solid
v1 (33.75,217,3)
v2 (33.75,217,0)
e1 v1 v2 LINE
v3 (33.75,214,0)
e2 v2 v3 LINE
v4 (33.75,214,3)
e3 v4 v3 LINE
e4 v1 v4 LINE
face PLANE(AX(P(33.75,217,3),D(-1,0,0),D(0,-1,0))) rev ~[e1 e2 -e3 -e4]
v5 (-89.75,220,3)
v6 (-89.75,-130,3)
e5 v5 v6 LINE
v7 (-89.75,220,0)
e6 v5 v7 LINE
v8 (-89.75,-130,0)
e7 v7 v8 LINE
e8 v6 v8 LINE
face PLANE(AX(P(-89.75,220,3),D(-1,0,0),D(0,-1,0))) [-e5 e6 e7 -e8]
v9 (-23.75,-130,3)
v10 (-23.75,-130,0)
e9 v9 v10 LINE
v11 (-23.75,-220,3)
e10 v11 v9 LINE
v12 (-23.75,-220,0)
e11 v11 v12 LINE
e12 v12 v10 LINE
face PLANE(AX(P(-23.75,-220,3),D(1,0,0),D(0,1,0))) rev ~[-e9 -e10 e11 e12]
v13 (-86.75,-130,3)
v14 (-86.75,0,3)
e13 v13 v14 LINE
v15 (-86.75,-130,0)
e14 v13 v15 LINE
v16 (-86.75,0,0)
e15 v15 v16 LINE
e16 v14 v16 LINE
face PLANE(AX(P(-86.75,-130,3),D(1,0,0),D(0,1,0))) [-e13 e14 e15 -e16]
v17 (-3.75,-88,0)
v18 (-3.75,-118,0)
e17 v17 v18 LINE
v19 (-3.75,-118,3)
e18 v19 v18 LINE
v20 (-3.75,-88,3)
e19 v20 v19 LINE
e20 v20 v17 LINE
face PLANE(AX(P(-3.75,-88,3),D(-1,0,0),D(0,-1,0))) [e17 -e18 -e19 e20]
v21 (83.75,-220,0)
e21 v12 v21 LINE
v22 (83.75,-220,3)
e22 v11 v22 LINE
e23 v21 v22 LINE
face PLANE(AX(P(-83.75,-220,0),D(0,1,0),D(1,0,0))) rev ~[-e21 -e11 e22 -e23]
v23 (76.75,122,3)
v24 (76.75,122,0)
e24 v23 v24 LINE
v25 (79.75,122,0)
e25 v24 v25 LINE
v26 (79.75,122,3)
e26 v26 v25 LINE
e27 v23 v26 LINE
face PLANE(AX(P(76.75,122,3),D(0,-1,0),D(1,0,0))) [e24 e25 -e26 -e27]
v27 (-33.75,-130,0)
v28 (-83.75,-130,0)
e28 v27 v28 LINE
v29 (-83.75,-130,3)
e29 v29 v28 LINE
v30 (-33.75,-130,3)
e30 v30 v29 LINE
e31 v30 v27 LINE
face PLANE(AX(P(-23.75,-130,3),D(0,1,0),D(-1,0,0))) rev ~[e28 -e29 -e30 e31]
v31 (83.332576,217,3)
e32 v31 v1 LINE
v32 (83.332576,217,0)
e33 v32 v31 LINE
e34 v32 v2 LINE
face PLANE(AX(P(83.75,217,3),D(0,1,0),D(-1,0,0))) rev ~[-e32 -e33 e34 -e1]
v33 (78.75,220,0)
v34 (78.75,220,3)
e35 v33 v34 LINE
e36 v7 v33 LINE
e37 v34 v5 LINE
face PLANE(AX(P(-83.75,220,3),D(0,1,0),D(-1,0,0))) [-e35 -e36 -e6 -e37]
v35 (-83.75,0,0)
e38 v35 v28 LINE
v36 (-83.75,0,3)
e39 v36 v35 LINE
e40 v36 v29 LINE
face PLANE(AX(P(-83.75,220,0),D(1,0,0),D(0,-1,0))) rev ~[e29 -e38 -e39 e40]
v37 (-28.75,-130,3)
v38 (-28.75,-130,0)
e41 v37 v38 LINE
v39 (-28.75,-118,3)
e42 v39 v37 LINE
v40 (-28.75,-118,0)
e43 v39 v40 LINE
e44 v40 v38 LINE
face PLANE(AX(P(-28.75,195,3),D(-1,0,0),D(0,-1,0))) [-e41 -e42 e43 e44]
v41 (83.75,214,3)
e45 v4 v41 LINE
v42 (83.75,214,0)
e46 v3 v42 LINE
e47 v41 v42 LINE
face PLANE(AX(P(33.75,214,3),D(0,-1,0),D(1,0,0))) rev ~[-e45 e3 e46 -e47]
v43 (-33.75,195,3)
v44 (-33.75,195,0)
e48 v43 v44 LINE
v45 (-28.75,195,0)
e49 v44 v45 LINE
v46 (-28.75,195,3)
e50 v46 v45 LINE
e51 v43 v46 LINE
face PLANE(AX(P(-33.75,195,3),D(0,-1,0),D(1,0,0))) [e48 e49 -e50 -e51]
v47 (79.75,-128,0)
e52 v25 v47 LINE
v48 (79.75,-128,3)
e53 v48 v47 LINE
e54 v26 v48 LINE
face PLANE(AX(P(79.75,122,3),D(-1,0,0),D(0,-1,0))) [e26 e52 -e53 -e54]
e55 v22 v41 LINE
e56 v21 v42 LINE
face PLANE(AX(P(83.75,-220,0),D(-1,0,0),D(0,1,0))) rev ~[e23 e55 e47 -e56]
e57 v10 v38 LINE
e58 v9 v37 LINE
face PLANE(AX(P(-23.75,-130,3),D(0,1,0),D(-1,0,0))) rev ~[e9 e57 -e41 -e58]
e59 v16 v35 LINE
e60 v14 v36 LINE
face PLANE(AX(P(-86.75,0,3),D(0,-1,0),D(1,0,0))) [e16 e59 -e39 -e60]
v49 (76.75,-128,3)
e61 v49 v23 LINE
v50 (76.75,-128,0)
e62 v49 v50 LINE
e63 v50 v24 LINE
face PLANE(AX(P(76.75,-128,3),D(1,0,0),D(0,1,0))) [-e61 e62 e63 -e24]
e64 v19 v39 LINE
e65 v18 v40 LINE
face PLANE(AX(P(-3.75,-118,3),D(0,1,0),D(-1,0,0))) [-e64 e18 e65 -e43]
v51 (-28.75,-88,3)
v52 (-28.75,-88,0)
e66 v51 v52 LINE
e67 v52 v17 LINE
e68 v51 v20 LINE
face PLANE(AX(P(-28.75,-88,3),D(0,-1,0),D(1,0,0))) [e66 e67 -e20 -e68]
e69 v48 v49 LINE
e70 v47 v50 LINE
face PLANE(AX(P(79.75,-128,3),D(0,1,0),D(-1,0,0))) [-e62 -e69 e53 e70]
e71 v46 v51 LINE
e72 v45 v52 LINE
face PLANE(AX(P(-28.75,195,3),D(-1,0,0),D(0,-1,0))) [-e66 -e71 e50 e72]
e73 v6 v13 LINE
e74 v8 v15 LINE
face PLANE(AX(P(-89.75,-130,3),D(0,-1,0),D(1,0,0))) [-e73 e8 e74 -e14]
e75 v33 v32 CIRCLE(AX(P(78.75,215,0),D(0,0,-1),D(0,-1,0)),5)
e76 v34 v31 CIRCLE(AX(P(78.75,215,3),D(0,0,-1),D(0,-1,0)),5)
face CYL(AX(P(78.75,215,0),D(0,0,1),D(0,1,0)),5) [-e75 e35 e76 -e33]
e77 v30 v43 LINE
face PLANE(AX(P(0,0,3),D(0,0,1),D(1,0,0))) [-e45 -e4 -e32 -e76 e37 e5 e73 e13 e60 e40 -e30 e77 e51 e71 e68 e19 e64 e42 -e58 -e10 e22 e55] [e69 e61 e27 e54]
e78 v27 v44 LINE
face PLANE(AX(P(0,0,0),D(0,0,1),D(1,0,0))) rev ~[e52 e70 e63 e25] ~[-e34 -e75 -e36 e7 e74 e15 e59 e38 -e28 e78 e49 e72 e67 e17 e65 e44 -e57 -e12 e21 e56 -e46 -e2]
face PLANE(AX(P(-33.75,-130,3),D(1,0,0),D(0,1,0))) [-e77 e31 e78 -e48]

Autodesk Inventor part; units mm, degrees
ref_plane "YZ Plane" through (0, 0, 0) normal (1, 0, 0) x (0, 1, 0)
ref_plane "XZ Plane" through (0, 0, 0) normal (0, 1, 0) x (-1, 0, 0)
ref_plane "XY Plane" through (0, 0, 0) normal (0, 0, 1) x (1, 0, 0)
sketch "Sketch8" plane through (0, 0, 3) normal (0, 0, 1) x (1, 0, 0)
  line L0 (-83.75, -130) -> (-83.75, 220)
  line L1 (-83.75, 220) -> (-89.75, 220)
  line L2 (-89.75, 220) -> (-89.75, -130)
  line L3 (-89.75, -130) -> (-83.75, -130)
  line L4 (-83.75, -130) -> (-83.75, 220)
  line L5 (-86.75, -130) -> (-86.75, 0)
  line L6 (-86.75, 0) -> (-83.75, 0)
  point P0 (0, 0)
  dimension "d35" = 6
sketch "Sketch1" plane through (0, 0, 0) normal (0, 0, 1) x (1, 0, 0)
  line L0 (-83.75, -220) -> (83.75, -220)
  line L1 (83.75, -220) -> (83.75, 220)
  line L2 (83.75, 220) -> (-83.75, 220)
  line L3 (-83.75, 220) -> (-83.75, -220)
  line L4 (-83.75, -220) -> (83.75, 220) construction
  line L5 (83.75, -220) -> (-83.75, 220) construction
  point P0 (0, 0)
  dimension "d0" = 440
  dimension "d1" = 167.5
extrude "Plate1" add sketch "Sketch1" along normal blind 3
sketch "Sketch3" plane through (0, 0, 3) normal (0, 0, 1) x (1, 0, 0)
  line L0 (-83.75, -220) -> (83.75, -220) projected
  line L1 (-83.75, -220) -> (-23.75, -220)
  line L2 (-23.75, -220) -> (-23.75, -130)
  line L3 (-23.75, -130) -> (-83.75, -130)
  line L4 (-83.75, -130) -> (-83.75, -220)
  point P0 (0, 0)
  dimension "d7" = 60
  dimension "d8" = 90
extrude "Cut2" cut sketch "Sketch3" against normal blind 3
sketch "Sketch4" plane through (0, 0, 3) normal (0, 0, 1) x (1, 0, 0)
  line L0 (-83.75, 220) -> (-83.75, -130) projected
  line L1 (-28.75, -88) -> (-3.75, -88)
  line L2 (-3.75, -88) -> (-3.75, -118)
  line L3 (-3.75, -118) -> (-83.75, -118)
  line L4 (-83.75, -118) -> (-83.75, -93)
  line L5 (-83.75, -130) -> (-23.75, -130) projected
  line L6 (-28.75, -88) -> (-28.75, -118)
  point P0 (0, 0)
  dimension "d11" = 12
  dimension "d12" = 30
  dimension "d13" = 25
  dimension "d16" = 55
extrude "Cut3" cut sketch "Sketch4" against normal blind 3
sketch "Sketch5" plane through (0, 0, 3) normal (0, 0, 1) x (1, 0, 0)
  line L0 (-33.75, 195) -> (-28.75, 195)
  line L1 (-28.75, 195) -> (-28.75, -130)
  line L2 (-28.75, -130) -> (-33.75, -130)
  line L3 (-33.75, -130) -> (-33.75, 195)
  line L4 (-83.75, 220) -> (83.75, 220) projected
  line L5 (-83.75, -130) -> (-23.75, -130) projected
  line L6 (-83.75, -130) -> (-83.75, 220) projected
  point P0 (0, 0)
  point P1 (-31.25, -130)
  dimension "d17" = 25
  dimension "d18" = 5
  dimension "d19" = 50
extrude "Cut4" cut sketch "Sketch5" against normal blind 3
fillet "Corner Round1" radius 5 1 edges at (83.75, 220, 1.5)
sketch "Sketch6" plane through (0, 0, 3) normal (0, 0, 1) x (1, 0, 0)
  line L0 (83.75, 215) -> (83.75, -220) projected
  line L1 (83.75, 217) -> (33.75, 217)
  line L2 (33.75, 217) -> (33.75, 214)
  line L3 (33.75, 214) -> (83.75, 214)
  line L4 (83.75, 214) -> (83.75, 217)
  line L5 (-83.75, 220) -> (78.75, 220) projected
  point P0 (0, 0)
  point P1 (-78.75, 220)
  dimension "d24" = 50
  dimension "d25" = 3
  dimension "d26" = 3
extrude "Cut5" cut sketch "Sketch6" against normal blind 3
sketch "Sketch7" plane through (0, 0, 3) normal (0, 0, 1) x (1, 0, 0)
  line L0 (76.75, 122) -> (79.75, 122)
  line L1 (79.75, 122) -> (79.75, -128)
  line L2 (79.75, -128) -> (76.75, -128)
  line L3 (76.75, -128) -> (76.75, 122)
  line L4 (83.75, 214) -> (83.75, -220) projected
  line L5 (83.75, -220) -> (-23.75, -220) projected
  point P0 (0, 0)
  dimension "d29" = 3
  dimension "d30" = 4
  dimension "d31" = 92
  dimension "d32" = 250
extrude "Cut6" cut sketch "Sketch7" against normal blind 3
sheet face with bend "Face2" sketch "Sketch8" thickness 3 toward (0, 0, -1) bend radius 3 contours L6 L5 L3 L2 L1 L0
bend "Bend1"
equation "\"d9\" = Thickness"
equation "\"d14\" = Thickness"
equation "\"d20\" = Thickness"
equation "\"d27\" = Thickness"
equation "\"d33\" = Thickness"
equation "\"d2\" = Thickness"
equation "\"d36\" = BendRadius"
equation "\"d37\" = BendReliefWidth"
equation "\"d39\" = MinimumRemnant"
equation "\"d38\" = BendReliefDepth"
equation "\"d40\" = TransitionRadius"
equation "\"BendRadius\" = Thickness"
equation "\"BendReliefWidth\" = Thickness"
equation "\"BendReliefDepth\" = 0.5 * Thickness"
equation "\"CornerReliefSize\" = 4 * Thickness"
equation "\"MinimumRemnant\" = 2 * Thickness"
equation "\"TransitionRadius\" = BendRadius"
equation "\"JacobiRadiusSize\" = BendRadius"
equation "\"GapSize\" = Thickness"
equation "\"Thickness\" = 3"
properties part number "Finishing Sheets .1  ( Right )"
